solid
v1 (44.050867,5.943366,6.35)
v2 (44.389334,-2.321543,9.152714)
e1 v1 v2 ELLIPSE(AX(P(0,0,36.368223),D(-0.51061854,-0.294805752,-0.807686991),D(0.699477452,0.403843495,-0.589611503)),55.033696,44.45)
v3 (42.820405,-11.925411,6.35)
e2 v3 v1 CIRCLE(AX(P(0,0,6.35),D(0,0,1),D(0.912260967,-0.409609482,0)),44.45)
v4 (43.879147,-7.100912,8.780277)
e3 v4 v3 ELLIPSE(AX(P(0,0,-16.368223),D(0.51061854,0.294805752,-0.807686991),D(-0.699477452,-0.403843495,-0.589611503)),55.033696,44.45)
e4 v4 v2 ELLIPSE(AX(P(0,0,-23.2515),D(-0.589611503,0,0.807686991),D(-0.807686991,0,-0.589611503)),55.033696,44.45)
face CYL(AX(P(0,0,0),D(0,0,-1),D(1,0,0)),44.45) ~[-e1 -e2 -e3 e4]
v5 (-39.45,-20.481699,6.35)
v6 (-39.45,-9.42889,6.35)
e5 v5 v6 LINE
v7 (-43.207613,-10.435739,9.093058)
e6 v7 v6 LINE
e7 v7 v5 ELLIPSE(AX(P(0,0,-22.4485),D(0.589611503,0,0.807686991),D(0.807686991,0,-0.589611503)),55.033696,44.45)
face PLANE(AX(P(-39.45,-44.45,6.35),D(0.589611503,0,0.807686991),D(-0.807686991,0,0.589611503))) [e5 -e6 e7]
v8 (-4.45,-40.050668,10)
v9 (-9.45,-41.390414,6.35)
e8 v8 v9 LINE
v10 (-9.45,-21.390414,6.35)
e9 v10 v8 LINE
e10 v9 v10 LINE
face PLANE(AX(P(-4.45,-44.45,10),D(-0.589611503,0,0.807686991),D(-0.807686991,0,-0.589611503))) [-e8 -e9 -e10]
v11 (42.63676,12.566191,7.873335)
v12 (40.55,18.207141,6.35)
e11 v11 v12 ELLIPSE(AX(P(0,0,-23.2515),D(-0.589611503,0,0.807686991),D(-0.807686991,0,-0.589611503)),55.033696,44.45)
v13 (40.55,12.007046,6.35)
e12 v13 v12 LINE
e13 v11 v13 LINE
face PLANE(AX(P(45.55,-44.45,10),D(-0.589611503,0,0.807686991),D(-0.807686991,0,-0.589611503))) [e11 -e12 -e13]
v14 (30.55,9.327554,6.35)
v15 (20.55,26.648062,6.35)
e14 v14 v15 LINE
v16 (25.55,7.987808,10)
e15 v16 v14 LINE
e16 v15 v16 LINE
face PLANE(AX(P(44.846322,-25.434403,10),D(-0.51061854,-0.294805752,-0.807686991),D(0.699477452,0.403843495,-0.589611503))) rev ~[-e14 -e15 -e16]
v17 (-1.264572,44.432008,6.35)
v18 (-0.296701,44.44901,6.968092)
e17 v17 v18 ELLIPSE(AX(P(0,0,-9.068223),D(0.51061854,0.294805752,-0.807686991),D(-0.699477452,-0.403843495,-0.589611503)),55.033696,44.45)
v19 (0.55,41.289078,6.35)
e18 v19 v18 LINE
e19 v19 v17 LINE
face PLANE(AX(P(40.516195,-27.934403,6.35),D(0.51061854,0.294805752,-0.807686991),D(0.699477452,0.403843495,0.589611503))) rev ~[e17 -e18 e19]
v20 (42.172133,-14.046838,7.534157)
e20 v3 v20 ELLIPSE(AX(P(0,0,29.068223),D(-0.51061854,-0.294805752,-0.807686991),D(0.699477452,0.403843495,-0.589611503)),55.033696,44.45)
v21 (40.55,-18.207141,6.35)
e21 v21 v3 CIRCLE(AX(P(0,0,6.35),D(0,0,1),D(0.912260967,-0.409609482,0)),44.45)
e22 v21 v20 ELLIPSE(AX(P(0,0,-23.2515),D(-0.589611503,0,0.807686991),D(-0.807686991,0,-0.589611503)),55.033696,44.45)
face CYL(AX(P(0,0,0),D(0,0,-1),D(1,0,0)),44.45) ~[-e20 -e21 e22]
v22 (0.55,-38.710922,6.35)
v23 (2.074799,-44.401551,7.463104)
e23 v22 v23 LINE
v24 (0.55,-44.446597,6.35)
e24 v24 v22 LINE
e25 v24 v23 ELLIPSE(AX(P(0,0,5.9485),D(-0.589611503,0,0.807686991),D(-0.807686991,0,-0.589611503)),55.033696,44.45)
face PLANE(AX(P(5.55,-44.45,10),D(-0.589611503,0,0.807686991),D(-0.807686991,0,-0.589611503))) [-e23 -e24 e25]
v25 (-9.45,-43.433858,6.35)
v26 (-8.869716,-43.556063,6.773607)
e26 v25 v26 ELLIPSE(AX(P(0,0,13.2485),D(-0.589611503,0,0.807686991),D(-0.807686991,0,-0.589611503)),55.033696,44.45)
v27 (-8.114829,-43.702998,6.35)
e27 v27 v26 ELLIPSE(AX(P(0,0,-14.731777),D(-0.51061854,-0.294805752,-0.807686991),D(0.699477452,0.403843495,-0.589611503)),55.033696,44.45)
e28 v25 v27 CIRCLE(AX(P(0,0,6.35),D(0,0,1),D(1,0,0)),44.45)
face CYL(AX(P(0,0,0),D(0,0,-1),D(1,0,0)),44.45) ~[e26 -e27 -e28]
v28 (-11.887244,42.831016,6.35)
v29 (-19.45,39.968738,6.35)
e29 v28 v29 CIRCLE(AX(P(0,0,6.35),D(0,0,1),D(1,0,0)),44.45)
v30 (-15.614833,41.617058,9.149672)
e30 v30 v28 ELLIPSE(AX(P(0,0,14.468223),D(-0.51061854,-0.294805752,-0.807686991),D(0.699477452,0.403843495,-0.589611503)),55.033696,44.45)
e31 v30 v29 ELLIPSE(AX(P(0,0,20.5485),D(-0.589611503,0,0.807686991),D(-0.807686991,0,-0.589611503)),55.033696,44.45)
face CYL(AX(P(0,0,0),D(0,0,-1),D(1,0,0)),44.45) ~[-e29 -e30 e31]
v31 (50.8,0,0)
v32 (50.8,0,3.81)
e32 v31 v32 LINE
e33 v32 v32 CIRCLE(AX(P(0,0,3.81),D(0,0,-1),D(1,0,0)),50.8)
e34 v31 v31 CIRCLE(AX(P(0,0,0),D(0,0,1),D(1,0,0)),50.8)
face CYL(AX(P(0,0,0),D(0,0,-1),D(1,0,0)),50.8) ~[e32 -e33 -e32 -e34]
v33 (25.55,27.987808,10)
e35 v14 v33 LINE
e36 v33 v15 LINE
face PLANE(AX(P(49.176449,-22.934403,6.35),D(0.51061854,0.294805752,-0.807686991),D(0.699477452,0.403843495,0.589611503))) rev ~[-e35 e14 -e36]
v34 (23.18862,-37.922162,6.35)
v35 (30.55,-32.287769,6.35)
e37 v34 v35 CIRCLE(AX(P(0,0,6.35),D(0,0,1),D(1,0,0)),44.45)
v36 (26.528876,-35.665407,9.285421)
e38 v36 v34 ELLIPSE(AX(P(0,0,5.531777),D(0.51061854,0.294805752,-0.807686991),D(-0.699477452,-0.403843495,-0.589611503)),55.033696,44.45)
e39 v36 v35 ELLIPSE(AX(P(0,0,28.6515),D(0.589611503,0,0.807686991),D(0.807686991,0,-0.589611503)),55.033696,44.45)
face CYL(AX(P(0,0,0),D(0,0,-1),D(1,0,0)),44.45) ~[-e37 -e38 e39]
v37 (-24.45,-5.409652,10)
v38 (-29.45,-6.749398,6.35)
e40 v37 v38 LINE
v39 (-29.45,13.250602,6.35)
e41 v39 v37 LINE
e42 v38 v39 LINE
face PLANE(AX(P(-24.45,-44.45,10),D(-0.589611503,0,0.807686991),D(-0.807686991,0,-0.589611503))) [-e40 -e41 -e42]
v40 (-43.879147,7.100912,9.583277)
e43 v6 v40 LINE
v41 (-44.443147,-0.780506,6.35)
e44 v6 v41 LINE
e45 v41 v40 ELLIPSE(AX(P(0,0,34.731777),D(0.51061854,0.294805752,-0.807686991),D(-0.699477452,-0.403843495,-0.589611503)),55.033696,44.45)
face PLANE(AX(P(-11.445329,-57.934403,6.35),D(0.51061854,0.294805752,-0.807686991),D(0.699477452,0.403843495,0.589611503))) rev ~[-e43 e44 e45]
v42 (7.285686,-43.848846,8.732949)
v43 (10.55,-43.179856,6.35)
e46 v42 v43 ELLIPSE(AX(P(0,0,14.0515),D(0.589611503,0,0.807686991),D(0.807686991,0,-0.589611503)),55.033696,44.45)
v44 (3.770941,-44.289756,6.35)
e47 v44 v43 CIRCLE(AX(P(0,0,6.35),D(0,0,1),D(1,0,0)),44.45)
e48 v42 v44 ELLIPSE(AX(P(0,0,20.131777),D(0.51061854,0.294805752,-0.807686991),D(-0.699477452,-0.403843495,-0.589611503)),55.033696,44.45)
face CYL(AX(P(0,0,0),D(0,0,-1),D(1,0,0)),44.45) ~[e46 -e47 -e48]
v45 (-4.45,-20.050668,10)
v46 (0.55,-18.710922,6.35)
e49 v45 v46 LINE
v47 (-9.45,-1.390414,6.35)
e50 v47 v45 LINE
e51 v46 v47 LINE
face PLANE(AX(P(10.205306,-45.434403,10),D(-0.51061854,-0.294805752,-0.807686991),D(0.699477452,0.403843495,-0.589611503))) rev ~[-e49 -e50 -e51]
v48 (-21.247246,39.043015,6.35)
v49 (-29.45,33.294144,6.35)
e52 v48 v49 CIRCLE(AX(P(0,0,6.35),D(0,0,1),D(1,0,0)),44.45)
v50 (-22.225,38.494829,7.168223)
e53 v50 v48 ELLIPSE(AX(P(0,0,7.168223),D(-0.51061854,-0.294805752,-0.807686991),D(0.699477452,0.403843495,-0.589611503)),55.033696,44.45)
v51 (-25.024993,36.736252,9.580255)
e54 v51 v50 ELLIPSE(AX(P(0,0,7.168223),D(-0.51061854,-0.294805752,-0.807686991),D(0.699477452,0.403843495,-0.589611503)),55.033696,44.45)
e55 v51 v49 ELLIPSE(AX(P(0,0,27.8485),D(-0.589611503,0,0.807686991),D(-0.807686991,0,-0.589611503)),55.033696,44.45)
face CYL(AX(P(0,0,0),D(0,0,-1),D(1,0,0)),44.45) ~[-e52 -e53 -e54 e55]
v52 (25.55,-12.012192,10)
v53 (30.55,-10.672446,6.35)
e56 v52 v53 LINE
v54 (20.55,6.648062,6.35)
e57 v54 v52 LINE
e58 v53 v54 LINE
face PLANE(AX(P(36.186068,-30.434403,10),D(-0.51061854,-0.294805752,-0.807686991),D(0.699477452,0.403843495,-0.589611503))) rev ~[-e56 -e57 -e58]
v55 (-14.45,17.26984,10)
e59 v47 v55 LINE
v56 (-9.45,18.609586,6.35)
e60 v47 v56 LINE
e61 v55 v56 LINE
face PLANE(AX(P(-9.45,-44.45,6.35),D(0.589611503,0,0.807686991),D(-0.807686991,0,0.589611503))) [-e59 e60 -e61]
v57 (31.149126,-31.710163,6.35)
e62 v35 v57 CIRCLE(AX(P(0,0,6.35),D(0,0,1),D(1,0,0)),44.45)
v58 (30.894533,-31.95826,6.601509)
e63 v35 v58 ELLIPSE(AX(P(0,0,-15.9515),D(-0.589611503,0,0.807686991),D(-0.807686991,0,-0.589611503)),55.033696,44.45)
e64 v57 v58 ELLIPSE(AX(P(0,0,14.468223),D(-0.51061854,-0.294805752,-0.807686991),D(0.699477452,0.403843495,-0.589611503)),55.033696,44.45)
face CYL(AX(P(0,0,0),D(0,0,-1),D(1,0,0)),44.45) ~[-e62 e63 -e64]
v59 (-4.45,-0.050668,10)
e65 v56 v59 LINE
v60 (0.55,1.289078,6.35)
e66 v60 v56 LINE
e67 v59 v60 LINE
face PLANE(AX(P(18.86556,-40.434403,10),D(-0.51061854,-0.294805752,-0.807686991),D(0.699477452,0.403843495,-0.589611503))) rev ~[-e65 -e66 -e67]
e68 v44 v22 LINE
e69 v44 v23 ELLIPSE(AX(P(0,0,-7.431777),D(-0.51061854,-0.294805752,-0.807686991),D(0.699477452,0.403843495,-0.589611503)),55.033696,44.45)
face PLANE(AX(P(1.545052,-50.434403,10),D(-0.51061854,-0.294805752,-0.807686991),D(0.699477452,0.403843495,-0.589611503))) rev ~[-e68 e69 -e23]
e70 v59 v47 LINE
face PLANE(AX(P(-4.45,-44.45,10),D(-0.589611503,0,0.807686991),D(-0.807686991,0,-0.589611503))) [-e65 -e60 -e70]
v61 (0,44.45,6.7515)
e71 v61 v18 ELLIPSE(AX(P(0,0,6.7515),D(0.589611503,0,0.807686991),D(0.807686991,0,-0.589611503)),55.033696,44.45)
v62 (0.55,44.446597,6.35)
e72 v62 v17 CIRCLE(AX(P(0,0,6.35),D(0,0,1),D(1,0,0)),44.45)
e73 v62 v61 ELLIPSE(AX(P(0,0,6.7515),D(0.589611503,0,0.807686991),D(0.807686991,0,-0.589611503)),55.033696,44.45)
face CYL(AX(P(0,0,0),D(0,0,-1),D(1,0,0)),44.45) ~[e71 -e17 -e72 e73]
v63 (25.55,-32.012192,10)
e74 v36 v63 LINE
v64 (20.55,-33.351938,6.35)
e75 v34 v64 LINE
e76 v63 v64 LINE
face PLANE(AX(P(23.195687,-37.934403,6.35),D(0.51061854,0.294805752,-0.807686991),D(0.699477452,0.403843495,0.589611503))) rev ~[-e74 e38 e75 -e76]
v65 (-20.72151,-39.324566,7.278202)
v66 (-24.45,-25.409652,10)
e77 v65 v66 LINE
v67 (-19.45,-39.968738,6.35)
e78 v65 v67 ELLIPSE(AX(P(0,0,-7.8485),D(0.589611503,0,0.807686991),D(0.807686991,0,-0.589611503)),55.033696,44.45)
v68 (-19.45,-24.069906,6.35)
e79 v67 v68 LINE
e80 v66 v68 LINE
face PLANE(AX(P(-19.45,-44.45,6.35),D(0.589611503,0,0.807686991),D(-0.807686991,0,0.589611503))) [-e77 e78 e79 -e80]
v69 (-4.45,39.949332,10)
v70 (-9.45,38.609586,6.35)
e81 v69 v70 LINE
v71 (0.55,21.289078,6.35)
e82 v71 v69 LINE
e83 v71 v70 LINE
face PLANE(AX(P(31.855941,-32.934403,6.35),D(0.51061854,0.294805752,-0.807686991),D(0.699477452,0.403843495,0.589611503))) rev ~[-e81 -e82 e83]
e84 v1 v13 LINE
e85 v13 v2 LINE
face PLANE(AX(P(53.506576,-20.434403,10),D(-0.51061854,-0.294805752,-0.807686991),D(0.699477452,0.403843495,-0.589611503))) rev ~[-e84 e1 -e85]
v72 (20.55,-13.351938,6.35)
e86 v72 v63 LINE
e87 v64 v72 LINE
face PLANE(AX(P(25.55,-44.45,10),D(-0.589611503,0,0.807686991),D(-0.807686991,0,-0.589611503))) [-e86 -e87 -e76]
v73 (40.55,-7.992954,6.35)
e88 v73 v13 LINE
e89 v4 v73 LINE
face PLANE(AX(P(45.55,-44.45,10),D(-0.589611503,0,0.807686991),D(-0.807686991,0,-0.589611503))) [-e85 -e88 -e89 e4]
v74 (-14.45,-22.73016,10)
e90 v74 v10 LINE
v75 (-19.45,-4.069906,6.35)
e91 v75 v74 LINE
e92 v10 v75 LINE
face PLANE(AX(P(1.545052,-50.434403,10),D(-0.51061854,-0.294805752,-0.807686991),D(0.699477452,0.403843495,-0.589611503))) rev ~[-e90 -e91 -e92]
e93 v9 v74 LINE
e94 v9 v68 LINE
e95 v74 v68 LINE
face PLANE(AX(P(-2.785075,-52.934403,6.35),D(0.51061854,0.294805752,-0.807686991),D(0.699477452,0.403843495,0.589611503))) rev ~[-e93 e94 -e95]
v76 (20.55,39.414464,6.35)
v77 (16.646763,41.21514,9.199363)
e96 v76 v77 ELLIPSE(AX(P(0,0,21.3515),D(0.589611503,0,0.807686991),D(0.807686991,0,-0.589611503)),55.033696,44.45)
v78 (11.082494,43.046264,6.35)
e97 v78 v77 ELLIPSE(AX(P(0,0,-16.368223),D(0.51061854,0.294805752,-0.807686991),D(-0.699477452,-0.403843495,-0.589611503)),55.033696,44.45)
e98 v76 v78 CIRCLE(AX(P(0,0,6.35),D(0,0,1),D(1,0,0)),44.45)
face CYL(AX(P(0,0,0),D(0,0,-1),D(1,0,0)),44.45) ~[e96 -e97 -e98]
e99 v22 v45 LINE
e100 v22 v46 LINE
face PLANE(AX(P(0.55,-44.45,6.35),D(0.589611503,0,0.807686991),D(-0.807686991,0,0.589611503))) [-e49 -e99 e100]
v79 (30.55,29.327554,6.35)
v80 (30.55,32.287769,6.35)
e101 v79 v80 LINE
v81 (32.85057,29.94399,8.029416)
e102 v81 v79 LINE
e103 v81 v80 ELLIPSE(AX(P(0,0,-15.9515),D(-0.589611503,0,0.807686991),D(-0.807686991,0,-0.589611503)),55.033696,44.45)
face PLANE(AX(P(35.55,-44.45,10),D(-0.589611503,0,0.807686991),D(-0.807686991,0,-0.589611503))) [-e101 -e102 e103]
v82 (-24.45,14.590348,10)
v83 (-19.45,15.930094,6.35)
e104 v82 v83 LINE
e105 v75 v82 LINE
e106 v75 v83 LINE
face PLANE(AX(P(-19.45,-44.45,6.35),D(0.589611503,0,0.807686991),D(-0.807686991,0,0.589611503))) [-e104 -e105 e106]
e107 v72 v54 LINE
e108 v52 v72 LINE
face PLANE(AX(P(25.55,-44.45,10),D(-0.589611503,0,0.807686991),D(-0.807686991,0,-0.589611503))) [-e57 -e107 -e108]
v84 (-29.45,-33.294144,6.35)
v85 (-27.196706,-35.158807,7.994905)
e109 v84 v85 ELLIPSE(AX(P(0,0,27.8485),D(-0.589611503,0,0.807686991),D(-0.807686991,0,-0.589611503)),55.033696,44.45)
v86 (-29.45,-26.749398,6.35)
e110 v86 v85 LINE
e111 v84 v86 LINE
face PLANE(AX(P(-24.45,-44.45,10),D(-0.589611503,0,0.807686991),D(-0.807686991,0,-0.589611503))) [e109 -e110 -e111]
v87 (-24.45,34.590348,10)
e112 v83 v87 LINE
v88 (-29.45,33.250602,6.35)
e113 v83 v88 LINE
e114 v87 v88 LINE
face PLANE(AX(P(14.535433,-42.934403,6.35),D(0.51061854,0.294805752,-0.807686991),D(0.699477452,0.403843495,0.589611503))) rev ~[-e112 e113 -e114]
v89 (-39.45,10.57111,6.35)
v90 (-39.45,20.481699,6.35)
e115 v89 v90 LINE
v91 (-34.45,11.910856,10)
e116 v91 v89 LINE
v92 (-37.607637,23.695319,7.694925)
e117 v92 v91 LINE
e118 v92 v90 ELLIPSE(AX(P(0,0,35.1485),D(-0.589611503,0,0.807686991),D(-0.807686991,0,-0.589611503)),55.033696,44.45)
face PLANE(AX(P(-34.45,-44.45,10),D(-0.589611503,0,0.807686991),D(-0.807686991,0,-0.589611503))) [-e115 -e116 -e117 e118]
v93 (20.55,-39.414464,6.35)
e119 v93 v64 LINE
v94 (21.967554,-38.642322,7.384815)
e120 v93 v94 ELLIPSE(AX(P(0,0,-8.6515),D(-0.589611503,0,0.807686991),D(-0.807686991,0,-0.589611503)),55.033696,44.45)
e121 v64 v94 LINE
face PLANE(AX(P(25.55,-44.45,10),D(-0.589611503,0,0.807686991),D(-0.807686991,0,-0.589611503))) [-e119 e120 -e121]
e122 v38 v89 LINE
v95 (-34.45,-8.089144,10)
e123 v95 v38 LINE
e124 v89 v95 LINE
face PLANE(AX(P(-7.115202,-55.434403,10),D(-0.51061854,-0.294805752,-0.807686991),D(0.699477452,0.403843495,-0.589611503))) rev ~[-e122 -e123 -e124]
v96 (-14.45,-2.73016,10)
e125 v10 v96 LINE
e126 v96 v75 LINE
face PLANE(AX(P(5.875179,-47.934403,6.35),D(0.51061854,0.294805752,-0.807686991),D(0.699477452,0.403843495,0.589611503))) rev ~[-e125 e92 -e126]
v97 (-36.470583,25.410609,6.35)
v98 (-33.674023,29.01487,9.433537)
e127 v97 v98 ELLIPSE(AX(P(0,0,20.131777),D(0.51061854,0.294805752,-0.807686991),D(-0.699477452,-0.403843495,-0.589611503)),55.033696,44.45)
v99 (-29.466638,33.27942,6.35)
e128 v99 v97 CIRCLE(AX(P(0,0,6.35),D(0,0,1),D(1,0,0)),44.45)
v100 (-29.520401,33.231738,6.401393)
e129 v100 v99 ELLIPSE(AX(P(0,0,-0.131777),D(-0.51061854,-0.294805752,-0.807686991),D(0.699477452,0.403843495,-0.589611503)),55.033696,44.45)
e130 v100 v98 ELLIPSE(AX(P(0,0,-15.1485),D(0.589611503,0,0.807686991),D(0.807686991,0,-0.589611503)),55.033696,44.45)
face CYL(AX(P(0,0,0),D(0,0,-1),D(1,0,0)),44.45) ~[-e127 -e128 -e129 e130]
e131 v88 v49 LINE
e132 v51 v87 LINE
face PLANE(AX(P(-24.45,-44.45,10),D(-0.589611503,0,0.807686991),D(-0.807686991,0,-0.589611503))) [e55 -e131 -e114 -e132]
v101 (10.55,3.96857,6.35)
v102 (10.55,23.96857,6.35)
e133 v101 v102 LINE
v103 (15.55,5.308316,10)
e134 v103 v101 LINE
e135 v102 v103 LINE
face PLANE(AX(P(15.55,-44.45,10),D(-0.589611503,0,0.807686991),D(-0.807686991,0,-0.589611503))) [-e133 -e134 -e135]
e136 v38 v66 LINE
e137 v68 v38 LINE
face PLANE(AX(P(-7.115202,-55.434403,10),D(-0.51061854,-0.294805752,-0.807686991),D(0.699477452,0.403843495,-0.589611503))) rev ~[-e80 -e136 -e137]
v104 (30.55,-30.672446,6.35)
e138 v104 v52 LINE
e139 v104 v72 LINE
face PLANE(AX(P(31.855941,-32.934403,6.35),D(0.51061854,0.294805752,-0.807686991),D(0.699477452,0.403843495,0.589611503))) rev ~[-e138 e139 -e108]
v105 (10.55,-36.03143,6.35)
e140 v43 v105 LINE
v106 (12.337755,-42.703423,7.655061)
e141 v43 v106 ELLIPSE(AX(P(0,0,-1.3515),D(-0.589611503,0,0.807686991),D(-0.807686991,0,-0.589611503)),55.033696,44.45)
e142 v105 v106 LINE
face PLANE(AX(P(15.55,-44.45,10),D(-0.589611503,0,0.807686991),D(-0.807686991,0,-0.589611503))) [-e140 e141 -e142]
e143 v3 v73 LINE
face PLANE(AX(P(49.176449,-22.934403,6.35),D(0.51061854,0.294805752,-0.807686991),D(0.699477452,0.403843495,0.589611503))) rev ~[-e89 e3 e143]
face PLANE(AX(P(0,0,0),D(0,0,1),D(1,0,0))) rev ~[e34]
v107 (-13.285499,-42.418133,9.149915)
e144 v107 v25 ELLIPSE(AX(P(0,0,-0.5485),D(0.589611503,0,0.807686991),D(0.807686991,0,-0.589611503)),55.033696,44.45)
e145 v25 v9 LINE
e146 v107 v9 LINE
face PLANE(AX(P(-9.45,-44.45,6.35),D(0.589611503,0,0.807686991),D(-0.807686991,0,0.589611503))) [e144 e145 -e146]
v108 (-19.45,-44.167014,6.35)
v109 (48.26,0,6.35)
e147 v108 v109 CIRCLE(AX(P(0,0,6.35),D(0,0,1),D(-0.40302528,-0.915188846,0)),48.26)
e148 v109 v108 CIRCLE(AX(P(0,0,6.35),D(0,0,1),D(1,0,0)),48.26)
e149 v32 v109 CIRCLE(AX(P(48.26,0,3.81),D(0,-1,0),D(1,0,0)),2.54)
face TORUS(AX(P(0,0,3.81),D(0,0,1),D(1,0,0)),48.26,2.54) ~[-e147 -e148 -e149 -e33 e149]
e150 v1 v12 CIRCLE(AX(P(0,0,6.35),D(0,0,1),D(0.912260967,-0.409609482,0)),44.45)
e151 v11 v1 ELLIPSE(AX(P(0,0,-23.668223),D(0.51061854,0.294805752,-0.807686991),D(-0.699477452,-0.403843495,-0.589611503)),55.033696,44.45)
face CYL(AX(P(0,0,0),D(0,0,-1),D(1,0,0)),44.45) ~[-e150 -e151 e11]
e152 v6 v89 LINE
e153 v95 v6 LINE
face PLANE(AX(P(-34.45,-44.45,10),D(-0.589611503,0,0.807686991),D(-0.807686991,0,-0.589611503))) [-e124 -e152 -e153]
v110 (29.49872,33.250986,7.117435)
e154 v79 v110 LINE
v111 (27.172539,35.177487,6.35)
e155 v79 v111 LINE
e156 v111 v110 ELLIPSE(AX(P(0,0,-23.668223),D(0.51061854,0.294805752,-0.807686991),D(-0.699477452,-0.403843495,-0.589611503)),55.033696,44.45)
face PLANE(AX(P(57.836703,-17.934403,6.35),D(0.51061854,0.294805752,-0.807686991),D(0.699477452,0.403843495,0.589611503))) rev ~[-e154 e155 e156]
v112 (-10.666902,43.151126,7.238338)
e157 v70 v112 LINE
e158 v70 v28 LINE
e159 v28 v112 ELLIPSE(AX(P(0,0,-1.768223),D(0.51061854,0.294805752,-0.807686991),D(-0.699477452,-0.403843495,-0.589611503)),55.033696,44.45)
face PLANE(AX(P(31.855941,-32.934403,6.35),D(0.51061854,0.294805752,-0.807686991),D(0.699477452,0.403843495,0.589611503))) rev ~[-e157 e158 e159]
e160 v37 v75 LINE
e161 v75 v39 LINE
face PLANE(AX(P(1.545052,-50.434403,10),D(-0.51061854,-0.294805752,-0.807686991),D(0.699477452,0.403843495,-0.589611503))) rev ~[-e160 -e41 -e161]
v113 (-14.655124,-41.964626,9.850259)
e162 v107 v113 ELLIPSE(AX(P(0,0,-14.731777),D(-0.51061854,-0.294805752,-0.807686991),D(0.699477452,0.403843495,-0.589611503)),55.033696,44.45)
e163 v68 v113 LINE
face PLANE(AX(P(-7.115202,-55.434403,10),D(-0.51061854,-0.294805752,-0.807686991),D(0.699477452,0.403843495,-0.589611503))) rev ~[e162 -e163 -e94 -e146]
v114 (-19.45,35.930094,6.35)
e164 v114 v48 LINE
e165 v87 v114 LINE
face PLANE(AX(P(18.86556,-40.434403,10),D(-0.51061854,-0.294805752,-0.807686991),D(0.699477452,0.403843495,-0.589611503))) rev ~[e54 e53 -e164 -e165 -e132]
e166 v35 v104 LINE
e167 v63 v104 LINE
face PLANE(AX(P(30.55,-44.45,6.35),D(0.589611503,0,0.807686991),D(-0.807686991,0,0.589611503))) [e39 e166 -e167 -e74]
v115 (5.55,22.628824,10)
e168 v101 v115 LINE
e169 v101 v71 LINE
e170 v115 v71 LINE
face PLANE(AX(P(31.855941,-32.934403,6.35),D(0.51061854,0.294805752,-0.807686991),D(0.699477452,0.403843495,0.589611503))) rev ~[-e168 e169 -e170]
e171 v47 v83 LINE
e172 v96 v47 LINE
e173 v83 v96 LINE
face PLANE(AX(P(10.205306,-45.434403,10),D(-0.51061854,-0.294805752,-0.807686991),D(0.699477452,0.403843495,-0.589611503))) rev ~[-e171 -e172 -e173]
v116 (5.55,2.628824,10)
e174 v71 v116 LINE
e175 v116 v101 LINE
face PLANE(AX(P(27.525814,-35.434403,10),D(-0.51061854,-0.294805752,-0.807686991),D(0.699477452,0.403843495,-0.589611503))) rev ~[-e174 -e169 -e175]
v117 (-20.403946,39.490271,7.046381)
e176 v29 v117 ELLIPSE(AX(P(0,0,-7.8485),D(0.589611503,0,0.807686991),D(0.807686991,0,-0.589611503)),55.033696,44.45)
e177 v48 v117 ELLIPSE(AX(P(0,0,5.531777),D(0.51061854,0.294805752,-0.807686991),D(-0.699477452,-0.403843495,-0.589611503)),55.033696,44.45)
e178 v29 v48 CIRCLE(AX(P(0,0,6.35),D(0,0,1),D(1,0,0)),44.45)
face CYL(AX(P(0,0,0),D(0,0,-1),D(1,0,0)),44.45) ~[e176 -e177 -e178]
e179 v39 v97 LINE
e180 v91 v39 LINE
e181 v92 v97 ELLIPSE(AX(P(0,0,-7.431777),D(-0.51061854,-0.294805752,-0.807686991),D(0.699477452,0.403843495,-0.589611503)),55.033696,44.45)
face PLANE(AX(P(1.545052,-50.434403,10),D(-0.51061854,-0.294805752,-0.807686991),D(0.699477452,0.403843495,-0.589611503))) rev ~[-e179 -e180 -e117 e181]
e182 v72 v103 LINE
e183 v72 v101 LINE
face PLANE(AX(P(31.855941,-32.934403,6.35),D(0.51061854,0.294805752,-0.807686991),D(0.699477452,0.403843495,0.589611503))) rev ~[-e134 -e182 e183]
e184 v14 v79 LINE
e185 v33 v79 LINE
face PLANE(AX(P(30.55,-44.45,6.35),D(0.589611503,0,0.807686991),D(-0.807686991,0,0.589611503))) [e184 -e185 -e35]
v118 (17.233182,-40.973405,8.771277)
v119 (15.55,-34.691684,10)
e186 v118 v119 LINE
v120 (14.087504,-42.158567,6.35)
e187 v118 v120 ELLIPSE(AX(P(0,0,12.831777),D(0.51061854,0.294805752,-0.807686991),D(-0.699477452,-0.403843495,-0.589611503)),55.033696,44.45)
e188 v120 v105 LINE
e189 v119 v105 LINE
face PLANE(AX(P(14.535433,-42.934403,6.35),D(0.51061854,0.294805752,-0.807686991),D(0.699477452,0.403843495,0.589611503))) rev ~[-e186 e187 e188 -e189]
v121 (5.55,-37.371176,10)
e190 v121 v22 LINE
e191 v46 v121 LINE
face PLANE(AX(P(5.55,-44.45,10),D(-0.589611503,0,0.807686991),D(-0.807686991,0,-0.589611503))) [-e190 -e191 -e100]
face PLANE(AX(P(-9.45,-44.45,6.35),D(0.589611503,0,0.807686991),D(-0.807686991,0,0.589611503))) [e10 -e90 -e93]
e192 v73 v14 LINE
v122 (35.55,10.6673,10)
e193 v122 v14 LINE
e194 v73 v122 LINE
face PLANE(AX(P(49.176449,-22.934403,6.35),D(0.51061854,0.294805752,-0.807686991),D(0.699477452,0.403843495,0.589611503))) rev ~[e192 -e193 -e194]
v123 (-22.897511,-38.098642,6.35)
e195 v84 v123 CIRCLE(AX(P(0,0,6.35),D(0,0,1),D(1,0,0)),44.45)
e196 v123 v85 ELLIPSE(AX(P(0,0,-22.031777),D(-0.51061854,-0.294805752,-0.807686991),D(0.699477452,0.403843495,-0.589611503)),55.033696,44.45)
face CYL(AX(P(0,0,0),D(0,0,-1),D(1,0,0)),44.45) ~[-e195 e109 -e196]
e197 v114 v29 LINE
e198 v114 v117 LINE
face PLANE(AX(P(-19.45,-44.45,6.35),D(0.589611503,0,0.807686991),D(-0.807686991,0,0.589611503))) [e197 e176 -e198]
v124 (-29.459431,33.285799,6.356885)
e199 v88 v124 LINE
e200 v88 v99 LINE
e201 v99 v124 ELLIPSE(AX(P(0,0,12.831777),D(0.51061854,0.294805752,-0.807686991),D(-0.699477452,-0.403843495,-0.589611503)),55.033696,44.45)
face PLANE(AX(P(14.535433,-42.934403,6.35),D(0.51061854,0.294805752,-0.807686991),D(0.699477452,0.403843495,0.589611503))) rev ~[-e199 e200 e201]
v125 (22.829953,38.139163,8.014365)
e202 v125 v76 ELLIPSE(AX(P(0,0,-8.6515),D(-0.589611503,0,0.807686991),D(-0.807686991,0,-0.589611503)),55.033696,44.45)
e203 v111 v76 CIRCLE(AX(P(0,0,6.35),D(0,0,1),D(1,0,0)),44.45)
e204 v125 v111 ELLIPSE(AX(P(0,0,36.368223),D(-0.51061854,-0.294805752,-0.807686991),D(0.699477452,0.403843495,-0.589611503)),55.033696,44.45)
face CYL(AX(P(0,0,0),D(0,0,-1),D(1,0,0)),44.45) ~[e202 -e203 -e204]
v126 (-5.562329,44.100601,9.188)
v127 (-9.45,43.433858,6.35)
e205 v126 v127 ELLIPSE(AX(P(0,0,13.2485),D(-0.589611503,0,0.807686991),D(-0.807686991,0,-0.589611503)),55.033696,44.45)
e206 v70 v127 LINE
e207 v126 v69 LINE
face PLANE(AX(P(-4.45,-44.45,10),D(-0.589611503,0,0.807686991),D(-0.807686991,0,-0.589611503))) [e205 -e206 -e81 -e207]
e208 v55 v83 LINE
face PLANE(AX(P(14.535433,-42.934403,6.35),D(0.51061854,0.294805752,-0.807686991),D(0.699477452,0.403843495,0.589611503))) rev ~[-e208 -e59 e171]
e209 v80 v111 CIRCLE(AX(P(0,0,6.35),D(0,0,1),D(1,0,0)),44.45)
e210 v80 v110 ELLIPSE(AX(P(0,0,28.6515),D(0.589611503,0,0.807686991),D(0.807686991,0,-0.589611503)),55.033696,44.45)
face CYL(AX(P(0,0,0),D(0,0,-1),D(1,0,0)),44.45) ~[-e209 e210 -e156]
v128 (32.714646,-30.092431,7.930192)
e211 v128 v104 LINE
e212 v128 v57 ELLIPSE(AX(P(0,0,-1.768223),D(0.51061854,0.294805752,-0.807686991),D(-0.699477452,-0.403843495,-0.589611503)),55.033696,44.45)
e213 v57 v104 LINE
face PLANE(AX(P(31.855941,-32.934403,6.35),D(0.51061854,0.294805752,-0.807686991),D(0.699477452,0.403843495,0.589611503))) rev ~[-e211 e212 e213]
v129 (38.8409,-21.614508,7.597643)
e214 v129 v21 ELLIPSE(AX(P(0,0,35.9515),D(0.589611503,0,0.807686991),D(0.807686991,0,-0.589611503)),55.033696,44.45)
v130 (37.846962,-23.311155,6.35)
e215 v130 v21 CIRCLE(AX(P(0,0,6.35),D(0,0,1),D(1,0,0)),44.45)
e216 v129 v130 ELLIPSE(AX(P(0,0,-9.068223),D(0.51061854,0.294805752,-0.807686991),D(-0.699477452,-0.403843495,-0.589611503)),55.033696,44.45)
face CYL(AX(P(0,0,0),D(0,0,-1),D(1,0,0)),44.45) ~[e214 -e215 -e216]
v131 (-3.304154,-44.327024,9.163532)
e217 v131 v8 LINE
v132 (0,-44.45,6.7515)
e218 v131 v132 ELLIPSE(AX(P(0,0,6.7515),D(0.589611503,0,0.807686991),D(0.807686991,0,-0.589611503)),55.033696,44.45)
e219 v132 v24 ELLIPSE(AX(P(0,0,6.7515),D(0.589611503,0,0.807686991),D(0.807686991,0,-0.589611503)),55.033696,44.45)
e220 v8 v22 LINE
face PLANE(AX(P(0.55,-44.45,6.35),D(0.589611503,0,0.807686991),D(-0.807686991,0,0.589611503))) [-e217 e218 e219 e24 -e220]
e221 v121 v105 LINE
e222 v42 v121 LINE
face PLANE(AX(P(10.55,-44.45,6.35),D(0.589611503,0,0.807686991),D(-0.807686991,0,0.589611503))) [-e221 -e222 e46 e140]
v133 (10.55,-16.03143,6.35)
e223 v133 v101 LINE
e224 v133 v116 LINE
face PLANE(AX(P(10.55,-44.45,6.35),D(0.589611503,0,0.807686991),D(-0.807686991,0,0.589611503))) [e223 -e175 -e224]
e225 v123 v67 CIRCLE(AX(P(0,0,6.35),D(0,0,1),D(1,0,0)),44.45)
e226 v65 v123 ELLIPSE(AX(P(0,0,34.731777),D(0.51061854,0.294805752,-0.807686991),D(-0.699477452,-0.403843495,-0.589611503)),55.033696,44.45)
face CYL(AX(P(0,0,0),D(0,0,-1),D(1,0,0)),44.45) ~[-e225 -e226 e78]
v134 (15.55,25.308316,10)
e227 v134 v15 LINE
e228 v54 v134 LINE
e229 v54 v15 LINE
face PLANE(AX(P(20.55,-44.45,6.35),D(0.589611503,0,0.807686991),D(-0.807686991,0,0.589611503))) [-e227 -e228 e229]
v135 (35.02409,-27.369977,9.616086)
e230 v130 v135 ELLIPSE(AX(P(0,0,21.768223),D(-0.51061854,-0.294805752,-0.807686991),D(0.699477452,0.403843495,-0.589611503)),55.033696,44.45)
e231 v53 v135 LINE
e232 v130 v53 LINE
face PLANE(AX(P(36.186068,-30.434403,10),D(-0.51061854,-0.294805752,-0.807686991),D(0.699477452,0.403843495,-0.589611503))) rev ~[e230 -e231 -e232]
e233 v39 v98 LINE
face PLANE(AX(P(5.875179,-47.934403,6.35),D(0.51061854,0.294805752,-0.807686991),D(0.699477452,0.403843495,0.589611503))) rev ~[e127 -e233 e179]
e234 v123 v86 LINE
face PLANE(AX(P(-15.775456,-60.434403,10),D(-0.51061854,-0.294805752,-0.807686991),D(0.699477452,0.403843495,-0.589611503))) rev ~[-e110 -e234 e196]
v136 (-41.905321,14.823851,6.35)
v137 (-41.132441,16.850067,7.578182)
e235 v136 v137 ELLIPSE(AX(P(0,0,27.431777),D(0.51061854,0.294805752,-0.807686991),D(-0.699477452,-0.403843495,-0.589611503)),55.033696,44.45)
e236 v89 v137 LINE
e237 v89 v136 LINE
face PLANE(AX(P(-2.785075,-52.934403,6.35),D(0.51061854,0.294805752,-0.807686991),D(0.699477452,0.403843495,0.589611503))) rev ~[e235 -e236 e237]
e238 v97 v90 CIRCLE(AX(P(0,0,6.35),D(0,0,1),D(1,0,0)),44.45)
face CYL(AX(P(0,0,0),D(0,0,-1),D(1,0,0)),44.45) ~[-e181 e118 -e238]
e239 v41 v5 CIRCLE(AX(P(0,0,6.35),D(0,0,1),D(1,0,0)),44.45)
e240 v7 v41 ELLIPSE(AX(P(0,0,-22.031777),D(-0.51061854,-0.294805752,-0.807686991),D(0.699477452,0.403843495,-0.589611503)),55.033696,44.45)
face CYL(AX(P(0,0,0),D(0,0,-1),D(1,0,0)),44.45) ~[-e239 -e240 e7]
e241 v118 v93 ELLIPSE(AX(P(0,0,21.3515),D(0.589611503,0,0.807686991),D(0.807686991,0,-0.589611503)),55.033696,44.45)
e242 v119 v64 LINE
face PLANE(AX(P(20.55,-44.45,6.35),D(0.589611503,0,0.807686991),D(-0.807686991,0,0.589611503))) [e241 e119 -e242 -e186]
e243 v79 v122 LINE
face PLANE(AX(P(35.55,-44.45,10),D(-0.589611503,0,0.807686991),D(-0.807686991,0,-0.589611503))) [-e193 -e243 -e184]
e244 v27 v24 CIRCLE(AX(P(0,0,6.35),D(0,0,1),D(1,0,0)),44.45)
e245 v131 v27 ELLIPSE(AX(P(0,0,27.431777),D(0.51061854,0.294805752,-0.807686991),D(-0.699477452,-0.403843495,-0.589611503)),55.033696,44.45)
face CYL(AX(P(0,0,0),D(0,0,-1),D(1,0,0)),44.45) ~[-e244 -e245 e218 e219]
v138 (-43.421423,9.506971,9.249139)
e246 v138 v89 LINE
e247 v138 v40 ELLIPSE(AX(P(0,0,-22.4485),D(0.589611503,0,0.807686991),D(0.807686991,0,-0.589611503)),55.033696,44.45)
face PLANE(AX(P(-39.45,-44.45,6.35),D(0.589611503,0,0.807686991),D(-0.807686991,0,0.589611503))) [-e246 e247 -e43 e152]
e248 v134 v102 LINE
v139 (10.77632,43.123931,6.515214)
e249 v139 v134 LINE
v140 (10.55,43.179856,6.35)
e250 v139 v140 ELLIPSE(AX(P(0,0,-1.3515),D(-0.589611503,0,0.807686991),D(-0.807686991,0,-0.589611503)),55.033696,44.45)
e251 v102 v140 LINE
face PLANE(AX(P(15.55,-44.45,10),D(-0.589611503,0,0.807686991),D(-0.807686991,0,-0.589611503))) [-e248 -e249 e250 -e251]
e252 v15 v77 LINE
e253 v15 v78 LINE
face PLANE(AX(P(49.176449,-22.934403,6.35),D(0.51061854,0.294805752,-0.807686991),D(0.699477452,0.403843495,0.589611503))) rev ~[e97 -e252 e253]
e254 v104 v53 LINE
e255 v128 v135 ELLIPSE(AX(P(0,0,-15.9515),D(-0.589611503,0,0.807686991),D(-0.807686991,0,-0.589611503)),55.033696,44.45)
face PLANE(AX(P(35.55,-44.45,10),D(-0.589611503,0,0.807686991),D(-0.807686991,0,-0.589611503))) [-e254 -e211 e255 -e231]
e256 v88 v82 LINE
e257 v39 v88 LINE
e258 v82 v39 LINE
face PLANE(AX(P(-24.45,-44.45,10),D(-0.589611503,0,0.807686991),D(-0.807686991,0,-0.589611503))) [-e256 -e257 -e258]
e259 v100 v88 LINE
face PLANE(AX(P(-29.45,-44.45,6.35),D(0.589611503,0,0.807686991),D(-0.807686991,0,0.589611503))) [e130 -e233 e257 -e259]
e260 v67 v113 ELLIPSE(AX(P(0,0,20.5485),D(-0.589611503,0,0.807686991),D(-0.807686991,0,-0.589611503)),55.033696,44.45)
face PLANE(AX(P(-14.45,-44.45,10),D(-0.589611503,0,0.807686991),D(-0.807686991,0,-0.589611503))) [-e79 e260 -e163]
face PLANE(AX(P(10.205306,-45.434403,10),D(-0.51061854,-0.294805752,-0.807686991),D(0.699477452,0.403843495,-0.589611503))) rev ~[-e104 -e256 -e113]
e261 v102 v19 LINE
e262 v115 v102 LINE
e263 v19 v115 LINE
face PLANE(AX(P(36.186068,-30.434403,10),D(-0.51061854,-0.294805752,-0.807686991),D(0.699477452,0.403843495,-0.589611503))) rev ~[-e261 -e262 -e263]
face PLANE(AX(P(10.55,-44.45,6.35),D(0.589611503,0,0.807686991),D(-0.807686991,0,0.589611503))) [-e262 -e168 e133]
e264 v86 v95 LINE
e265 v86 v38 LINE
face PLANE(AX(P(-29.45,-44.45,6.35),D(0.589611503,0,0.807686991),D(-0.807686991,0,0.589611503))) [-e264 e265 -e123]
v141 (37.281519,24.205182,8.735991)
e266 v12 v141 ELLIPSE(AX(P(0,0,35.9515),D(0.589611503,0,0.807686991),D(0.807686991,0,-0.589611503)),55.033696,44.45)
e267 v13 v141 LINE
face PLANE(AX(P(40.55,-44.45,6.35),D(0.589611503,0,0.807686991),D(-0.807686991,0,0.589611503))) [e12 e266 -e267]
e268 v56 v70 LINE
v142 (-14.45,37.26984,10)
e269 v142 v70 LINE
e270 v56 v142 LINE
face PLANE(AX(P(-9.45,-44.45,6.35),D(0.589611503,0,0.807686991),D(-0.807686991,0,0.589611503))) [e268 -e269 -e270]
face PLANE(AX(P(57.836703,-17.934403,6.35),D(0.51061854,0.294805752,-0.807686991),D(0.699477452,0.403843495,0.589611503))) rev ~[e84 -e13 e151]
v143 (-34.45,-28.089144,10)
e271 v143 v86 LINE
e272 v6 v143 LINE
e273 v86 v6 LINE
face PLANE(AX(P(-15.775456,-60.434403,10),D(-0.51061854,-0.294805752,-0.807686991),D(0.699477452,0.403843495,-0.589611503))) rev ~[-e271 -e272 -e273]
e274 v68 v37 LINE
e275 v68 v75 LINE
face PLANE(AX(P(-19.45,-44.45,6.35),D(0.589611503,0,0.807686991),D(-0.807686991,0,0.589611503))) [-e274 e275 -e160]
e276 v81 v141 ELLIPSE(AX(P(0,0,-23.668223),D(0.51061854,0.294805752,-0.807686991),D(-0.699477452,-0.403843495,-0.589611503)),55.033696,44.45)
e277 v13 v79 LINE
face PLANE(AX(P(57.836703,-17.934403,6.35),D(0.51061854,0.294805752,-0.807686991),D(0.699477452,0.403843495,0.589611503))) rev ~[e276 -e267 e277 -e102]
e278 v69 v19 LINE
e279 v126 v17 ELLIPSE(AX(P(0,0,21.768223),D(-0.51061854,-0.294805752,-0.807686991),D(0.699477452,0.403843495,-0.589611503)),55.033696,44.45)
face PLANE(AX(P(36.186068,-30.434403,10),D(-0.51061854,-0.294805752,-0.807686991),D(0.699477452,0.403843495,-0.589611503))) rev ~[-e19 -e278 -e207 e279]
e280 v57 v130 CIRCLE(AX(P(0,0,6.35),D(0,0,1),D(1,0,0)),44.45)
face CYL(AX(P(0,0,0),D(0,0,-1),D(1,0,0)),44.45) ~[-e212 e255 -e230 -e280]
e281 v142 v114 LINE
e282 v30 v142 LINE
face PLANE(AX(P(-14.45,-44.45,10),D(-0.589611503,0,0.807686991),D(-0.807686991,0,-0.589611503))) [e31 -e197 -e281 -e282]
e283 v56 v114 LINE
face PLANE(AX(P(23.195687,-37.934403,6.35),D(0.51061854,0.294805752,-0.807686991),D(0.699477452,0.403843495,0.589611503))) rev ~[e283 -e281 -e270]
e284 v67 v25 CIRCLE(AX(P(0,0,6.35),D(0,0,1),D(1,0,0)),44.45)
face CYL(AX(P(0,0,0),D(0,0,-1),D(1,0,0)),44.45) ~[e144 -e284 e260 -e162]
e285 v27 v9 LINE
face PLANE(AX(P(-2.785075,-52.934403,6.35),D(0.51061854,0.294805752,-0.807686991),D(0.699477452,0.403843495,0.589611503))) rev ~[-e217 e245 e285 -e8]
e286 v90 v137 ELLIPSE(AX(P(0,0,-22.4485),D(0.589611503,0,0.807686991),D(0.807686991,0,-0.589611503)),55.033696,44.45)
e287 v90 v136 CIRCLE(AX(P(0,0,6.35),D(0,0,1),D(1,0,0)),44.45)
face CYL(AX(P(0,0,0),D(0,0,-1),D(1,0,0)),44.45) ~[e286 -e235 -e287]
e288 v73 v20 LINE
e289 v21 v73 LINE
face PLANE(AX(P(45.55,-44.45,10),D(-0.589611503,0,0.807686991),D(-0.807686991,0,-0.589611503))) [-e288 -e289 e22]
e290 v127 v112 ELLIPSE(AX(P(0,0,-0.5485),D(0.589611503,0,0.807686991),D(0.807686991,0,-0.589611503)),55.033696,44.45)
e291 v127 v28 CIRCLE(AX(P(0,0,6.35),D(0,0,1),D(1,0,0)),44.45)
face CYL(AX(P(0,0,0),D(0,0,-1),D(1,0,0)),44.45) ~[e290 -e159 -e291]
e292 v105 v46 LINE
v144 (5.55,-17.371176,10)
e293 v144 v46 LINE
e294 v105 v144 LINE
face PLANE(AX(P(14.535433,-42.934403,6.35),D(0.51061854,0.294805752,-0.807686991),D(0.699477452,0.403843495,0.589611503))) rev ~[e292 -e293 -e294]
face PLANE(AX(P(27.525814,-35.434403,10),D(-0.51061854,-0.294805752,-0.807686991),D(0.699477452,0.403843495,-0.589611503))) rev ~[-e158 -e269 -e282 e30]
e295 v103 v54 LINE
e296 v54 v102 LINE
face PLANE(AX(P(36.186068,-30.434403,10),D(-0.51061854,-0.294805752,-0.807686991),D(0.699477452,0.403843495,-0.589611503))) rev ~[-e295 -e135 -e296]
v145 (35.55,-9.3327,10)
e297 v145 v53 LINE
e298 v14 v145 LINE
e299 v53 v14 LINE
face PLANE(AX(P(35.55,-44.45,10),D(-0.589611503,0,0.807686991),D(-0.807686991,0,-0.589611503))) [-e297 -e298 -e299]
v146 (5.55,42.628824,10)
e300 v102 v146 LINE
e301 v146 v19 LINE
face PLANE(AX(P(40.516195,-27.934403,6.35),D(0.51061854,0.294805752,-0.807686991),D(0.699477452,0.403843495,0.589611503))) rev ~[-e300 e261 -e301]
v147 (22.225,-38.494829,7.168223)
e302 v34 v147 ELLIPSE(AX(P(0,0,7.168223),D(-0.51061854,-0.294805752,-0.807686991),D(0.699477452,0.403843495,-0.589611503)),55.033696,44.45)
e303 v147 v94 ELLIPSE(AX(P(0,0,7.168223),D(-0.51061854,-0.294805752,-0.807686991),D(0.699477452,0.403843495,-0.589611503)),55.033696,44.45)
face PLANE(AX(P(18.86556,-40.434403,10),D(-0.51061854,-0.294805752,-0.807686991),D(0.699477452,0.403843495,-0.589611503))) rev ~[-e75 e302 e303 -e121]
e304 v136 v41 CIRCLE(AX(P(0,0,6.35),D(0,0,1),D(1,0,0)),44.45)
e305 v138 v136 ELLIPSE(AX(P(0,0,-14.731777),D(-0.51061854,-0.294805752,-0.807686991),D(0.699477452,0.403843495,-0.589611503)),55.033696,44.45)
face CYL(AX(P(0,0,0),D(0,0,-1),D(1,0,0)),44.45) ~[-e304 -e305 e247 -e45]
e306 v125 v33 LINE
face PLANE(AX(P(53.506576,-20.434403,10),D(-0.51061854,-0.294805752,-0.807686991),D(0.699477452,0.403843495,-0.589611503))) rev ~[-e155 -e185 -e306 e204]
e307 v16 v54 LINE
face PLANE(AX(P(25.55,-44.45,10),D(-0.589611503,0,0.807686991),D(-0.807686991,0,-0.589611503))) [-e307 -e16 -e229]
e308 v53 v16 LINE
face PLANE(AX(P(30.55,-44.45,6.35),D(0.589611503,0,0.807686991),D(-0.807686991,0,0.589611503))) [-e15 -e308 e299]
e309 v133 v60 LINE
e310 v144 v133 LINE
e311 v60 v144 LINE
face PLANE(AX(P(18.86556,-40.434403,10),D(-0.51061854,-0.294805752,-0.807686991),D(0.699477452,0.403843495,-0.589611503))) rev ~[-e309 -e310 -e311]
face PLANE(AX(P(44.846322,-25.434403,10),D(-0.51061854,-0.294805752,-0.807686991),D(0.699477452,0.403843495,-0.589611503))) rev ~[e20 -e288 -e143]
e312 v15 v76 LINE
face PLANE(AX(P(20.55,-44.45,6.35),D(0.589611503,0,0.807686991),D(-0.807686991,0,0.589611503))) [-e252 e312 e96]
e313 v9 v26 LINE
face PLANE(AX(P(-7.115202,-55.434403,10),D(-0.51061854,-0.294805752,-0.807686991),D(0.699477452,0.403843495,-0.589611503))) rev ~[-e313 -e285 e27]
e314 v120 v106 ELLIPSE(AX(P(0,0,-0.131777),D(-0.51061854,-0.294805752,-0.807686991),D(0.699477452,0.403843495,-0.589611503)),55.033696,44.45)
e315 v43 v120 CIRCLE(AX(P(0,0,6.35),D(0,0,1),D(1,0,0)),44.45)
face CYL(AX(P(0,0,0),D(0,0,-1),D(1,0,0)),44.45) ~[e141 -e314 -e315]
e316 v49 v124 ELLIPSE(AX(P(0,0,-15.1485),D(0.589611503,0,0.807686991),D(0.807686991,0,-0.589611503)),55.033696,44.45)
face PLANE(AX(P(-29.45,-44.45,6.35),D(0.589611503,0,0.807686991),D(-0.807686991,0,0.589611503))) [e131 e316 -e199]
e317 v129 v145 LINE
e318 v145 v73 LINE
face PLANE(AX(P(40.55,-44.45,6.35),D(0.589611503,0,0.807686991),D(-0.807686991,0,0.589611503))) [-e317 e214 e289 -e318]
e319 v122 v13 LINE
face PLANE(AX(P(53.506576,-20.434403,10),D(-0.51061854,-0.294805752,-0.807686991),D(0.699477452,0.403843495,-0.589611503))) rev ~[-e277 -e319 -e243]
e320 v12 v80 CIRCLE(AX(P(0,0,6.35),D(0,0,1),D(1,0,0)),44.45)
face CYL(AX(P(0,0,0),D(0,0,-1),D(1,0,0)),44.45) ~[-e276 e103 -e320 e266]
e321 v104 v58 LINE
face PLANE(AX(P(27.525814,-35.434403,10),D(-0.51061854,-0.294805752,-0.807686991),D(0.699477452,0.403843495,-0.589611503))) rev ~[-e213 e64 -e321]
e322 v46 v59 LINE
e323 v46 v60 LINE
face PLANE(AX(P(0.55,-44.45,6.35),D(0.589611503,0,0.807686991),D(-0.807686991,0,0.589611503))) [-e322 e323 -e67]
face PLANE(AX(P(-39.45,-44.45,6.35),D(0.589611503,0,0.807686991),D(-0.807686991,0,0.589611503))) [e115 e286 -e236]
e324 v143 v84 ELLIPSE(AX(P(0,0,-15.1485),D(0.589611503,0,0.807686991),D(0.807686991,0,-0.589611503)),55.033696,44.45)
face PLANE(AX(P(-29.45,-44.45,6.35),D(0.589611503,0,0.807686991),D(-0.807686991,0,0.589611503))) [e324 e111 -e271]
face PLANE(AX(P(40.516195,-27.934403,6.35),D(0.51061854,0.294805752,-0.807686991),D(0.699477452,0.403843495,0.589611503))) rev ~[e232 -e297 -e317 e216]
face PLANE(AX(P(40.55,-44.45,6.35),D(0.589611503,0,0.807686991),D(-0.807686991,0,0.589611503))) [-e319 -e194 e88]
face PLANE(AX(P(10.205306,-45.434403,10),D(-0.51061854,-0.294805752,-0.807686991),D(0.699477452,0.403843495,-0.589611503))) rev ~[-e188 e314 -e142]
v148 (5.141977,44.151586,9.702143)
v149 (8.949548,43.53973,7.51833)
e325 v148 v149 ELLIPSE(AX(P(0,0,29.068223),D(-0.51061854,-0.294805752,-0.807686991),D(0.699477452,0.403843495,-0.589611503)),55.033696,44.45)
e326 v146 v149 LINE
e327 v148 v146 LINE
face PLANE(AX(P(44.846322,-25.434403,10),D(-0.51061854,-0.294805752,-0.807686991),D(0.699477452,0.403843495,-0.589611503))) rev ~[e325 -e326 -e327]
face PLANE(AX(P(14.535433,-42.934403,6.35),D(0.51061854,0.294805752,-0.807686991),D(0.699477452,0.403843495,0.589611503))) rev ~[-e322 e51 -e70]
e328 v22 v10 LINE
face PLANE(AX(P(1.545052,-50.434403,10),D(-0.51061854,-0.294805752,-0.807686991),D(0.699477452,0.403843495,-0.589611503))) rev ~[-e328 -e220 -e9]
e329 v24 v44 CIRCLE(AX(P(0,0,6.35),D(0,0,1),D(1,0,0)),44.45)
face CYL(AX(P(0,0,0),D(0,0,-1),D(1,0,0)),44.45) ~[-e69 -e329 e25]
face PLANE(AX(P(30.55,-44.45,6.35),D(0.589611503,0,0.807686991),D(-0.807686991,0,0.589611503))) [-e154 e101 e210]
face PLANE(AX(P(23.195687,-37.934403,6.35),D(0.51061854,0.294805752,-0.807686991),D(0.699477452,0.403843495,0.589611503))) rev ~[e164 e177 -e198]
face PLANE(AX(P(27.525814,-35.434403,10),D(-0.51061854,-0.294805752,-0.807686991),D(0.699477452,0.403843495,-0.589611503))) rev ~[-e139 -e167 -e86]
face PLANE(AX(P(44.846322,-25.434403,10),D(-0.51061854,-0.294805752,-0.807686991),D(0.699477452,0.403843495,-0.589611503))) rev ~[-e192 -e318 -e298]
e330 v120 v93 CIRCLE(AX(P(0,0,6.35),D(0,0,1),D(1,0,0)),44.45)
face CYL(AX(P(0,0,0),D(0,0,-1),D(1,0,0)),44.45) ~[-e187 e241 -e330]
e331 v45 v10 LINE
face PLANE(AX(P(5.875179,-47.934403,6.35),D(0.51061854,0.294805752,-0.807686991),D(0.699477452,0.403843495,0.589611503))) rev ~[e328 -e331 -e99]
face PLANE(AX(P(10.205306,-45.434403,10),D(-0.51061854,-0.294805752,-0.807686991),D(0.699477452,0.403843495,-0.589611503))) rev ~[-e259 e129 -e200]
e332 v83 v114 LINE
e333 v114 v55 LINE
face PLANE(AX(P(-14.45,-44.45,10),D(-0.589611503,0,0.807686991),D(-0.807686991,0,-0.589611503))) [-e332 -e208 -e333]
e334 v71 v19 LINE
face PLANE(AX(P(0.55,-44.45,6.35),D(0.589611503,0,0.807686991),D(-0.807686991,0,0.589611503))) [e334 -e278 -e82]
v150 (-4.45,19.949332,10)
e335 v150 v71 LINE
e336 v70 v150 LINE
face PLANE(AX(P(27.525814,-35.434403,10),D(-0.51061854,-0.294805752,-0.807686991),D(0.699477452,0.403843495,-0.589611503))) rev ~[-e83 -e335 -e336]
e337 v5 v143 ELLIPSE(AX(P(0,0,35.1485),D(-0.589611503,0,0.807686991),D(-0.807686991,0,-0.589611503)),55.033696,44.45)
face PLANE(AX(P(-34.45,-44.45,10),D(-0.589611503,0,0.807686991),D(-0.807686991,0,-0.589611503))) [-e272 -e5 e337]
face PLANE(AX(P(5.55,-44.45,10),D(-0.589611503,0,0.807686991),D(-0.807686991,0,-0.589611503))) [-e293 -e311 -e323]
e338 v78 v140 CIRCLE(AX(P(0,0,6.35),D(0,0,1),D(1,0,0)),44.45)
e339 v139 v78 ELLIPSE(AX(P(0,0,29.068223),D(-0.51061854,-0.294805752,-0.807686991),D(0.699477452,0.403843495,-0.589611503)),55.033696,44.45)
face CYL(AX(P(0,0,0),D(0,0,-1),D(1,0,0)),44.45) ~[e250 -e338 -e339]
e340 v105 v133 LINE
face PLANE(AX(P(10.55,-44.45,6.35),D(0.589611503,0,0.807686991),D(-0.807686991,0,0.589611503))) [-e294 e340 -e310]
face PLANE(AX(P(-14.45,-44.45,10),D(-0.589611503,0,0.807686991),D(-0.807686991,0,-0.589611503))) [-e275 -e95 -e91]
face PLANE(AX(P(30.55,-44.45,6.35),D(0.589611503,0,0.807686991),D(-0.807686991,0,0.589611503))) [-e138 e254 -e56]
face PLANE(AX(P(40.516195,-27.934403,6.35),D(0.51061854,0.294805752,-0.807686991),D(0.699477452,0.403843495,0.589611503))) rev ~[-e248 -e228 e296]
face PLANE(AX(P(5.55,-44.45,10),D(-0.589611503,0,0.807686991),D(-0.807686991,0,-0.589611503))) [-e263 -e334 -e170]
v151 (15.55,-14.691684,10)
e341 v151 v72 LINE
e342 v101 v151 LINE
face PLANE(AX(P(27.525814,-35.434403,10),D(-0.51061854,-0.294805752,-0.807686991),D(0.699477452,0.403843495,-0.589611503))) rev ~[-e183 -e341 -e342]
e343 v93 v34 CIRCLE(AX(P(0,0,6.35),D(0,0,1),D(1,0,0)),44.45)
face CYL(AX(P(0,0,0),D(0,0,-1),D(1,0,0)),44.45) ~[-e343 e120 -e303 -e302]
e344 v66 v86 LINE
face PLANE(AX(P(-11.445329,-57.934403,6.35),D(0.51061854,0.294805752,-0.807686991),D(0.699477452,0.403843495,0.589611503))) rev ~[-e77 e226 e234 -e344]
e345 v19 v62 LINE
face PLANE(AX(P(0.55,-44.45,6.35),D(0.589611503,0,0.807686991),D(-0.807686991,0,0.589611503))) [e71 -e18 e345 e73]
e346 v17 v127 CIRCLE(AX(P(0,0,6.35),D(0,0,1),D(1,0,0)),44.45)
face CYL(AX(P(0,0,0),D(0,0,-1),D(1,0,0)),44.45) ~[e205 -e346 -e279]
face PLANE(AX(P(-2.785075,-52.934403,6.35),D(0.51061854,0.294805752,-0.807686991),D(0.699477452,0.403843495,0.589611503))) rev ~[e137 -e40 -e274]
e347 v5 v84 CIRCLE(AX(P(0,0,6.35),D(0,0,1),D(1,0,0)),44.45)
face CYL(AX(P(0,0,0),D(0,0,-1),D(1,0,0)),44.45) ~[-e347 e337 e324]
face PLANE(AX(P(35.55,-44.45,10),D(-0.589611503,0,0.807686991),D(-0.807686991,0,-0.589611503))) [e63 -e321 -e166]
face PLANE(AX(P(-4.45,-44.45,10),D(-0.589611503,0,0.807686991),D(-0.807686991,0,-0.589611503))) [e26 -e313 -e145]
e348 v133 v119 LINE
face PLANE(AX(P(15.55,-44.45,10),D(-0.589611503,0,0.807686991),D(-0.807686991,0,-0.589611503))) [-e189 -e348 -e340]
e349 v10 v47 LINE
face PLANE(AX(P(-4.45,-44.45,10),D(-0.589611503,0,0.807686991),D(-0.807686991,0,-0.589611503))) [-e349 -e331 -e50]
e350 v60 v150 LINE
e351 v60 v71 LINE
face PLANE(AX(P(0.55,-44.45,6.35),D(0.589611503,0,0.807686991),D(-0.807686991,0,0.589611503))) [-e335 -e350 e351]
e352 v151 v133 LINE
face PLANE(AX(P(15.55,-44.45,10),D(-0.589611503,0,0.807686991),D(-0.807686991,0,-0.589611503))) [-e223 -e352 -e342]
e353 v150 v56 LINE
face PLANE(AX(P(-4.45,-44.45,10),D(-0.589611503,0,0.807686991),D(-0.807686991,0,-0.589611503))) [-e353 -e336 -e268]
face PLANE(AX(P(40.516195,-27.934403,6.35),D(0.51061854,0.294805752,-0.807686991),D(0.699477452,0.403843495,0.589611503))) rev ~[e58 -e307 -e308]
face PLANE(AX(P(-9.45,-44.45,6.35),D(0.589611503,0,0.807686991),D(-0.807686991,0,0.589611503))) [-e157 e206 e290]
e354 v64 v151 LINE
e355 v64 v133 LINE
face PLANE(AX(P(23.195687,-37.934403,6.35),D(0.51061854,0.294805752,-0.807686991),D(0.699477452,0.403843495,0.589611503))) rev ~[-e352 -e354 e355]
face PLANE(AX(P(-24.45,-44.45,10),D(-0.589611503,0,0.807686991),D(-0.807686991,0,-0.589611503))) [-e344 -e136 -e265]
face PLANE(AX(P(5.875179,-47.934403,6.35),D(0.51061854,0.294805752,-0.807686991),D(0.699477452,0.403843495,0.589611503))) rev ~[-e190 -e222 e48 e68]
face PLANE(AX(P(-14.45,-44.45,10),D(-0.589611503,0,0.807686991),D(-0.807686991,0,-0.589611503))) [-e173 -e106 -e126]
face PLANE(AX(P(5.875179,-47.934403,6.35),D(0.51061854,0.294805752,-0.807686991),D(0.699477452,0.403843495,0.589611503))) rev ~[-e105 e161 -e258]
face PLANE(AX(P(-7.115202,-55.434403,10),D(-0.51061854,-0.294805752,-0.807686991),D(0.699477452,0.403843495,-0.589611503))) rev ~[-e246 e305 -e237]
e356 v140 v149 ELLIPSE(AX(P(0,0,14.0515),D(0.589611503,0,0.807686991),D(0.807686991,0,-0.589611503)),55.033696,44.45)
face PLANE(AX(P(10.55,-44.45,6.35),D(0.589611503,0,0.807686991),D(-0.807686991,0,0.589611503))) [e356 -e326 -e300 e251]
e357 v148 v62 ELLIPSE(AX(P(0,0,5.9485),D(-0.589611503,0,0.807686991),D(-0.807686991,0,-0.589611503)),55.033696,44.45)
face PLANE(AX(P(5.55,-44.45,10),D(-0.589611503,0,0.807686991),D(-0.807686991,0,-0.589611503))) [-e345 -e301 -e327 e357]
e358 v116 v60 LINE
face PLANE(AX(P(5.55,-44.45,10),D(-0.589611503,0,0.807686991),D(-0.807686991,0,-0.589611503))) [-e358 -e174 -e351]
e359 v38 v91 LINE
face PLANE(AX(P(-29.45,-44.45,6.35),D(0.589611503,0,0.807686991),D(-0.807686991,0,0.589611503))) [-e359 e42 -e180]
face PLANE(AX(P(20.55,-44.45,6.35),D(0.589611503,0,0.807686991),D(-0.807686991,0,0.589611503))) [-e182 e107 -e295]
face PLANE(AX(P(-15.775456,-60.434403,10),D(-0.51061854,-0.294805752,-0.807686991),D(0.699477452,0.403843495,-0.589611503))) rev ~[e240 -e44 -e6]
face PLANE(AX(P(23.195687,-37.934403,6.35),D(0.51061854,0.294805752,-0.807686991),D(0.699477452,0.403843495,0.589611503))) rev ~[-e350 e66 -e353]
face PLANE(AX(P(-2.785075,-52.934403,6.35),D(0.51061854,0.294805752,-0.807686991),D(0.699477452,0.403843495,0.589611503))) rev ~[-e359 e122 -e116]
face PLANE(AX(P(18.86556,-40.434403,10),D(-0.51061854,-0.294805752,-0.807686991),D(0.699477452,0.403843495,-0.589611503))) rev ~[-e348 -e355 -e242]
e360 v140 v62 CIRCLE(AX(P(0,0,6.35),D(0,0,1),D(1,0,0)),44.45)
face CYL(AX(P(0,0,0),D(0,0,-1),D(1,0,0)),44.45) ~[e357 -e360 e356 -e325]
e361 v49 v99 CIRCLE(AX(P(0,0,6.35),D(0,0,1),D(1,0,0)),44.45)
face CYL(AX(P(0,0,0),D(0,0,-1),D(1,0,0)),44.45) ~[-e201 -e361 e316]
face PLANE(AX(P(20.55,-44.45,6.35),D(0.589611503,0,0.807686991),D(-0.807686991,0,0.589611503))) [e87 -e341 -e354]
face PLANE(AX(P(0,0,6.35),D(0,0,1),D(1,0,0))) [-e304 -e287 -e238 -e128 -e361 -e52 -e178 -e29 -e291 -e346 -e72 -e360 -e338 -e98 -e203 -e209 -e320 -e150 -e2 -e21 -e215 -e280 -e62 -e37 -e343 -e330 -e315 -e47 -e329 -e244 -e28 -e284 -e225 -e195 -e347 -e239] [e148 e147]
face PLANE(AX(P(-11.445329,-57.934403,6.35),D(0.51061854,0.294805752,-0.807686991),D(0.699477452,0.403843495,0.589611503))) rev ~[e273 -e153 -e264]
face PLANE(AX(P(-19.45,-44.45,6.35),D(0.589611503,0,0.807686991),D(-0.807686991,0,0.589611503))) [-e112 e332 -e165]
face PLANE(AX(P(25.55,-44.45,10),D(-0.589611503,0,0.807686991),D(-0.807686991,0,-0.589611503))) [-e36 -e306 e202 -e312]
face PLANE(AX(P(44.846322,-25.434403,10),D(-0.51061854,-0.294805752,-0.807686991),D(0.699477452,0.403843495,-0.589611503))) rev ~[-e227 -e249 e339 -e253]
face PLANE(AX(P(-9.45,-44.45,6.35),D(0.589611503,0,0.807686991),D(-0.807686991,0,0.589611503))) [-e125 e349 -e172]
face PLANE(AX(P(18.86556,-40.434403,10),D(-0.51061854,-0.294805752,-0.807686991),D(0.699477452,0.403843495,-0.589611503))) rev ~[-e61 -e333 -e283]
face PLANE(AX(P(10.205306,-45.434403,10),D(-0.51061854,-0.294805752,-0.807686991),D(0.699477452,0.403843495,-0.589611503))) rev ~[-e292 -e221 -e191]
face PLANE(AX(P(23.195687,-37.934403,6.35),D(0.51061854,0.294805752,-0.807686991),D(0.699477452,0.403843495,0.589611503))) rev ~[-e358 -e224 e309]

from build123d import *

# Parameters (mm, degrees)
F0_R     = 50.8
F0_R_2   = 44.45
F1_DEPTH = 6.35
F2_DEPTH = 10
F7_DEPTH = 88.9
F9_DEPTH = 88.9


# Not quite as in the source:
# - a fillet or chamfer that OpenCascade refuses, or shapes differently, is made with other operations: its cross-section is extruded or revolved along the edge and cut away or added


with BuildPart() as f1:
    # F0 (on Top) → F1 (new body)
    with BuildSketch(Plane.XY):
        Circle(F0_R)
        Circle(F0_R_2, mode=Mode.SUBTRACT)
    extrude(amount=F1_DEPTH)

    # F0 (on Top) → F2 (join)
    with BuildSketch(Plane.XY):
        Circle(F0_R_2)
    extrude(amount=F2_DEPTH)

    # F6 (on face) → F7 (cut)
    with BuildSketch(Plane(origin=(0, -44.45, 0), x_dir=(-1, 0, 0), z_dir=(0, 1, 0))):
        Polygon((39.45, 6.35), (44.45, 10), (34.45, 10), align=None)
        Polygon((29.45, 6.35), (34.45, 10), (24.45, 10), align=None)
        Polygon((19.4500000001, 6.35), (24.45, 10), (14.4500000001, 10), align=None)
        Polygon((9.4500000001, 6.35), (14.4500000001, 10), (4.4500000002, 10), align=None)
        Polygon((-0.5499999998, 6.35), (4.4500000002, 10), (-5.5499999998, 10), align=None)
        Polygon((-10.5499999998, 6.35), (-5.5499999998, 10), (-15.5499999998, 10), align=None)
        Polygon((-20.5499999997, 6.35), (-15.5499999998, 10), (-25.5499999997, 10), align=None)
        Polygon((-30.5499999997, 6.35), (-25.5499999997, 10), (-35.5499999997, 10), align=None)
        Polygon((-40.5499999997, 6.35), (-35.5499999997, 10), (-45.5499999996, 10), align=None)
    extrude(amount=F7_DEPTH, mode=Mode.SUBTRACT)

    # F8 (on face) → F9 (cut)
    with BuildSketch(Plane(origin=(22.225, -38.4948291982, 0), x_dir=(0.8660254038, 0.5, 0), z_dir=(0.5, -0.8660254038, 0))):
        Polygon((-33.8791470656, 10), (-43.8791470656, 10), (-38.8791470656, 6.35), align=None)
        Polygon((-23.8791470657, 10), (-33.8791470656, 10), (-28.8791470656, 6.35), align=None)
        Polygon((-13.8791470657, 10), (-23.8791470657, 10), (-18.8791470657, 6.35), align=None)
        Polygon((-3.8791470657, 10), (-13.8791470657, 10), (-8.8791470657, 6.35), align=None)
        Polygon((6.1208529342, 10), (-3.8791470657, 10), (1.1208529342, 6.35), align=None)
        Polygon((16.1208529342, 10), (6.1208529342, 10), (11.1208529342, 6.35), align=None)
        Polygon((26.1208529341, 10), (16.1208529342, 10), (21.1208529342, 6.35), align=None)
        Polygon((36.1208529341, 10), (26.1208529341, 10), (31.1208529341, 6.35), align=None)
        Polygon((46.1208529341, 10), (36.1208529341, 10), (41.1208529341, 6.35), align=None)
    extrude(amount=-F9_DEPTH, mode=Mode.SUBTRACT)

    # F10: fillet of radius 2.54 on 1 edges, made by hand

    # F10_s1 → F10_t2 (revolve, cut)
    with BuildSketch(Plane.XZ):
        with BuildLine():
            ThreePointArc((50.8, 3.81), (50.0560512242, 5.6060512242), (48.26, 6.35))
            Line((48.26, 6.35), (50.8, 6.35))
            Line((50.8, 6.35), (50.8, 3.81))
        make_face()
    revolve(axis=Axis((0, 0, 6.35), (0, 0, -1)), mode=Mode.SUBTRACT)


solid = f1.part
